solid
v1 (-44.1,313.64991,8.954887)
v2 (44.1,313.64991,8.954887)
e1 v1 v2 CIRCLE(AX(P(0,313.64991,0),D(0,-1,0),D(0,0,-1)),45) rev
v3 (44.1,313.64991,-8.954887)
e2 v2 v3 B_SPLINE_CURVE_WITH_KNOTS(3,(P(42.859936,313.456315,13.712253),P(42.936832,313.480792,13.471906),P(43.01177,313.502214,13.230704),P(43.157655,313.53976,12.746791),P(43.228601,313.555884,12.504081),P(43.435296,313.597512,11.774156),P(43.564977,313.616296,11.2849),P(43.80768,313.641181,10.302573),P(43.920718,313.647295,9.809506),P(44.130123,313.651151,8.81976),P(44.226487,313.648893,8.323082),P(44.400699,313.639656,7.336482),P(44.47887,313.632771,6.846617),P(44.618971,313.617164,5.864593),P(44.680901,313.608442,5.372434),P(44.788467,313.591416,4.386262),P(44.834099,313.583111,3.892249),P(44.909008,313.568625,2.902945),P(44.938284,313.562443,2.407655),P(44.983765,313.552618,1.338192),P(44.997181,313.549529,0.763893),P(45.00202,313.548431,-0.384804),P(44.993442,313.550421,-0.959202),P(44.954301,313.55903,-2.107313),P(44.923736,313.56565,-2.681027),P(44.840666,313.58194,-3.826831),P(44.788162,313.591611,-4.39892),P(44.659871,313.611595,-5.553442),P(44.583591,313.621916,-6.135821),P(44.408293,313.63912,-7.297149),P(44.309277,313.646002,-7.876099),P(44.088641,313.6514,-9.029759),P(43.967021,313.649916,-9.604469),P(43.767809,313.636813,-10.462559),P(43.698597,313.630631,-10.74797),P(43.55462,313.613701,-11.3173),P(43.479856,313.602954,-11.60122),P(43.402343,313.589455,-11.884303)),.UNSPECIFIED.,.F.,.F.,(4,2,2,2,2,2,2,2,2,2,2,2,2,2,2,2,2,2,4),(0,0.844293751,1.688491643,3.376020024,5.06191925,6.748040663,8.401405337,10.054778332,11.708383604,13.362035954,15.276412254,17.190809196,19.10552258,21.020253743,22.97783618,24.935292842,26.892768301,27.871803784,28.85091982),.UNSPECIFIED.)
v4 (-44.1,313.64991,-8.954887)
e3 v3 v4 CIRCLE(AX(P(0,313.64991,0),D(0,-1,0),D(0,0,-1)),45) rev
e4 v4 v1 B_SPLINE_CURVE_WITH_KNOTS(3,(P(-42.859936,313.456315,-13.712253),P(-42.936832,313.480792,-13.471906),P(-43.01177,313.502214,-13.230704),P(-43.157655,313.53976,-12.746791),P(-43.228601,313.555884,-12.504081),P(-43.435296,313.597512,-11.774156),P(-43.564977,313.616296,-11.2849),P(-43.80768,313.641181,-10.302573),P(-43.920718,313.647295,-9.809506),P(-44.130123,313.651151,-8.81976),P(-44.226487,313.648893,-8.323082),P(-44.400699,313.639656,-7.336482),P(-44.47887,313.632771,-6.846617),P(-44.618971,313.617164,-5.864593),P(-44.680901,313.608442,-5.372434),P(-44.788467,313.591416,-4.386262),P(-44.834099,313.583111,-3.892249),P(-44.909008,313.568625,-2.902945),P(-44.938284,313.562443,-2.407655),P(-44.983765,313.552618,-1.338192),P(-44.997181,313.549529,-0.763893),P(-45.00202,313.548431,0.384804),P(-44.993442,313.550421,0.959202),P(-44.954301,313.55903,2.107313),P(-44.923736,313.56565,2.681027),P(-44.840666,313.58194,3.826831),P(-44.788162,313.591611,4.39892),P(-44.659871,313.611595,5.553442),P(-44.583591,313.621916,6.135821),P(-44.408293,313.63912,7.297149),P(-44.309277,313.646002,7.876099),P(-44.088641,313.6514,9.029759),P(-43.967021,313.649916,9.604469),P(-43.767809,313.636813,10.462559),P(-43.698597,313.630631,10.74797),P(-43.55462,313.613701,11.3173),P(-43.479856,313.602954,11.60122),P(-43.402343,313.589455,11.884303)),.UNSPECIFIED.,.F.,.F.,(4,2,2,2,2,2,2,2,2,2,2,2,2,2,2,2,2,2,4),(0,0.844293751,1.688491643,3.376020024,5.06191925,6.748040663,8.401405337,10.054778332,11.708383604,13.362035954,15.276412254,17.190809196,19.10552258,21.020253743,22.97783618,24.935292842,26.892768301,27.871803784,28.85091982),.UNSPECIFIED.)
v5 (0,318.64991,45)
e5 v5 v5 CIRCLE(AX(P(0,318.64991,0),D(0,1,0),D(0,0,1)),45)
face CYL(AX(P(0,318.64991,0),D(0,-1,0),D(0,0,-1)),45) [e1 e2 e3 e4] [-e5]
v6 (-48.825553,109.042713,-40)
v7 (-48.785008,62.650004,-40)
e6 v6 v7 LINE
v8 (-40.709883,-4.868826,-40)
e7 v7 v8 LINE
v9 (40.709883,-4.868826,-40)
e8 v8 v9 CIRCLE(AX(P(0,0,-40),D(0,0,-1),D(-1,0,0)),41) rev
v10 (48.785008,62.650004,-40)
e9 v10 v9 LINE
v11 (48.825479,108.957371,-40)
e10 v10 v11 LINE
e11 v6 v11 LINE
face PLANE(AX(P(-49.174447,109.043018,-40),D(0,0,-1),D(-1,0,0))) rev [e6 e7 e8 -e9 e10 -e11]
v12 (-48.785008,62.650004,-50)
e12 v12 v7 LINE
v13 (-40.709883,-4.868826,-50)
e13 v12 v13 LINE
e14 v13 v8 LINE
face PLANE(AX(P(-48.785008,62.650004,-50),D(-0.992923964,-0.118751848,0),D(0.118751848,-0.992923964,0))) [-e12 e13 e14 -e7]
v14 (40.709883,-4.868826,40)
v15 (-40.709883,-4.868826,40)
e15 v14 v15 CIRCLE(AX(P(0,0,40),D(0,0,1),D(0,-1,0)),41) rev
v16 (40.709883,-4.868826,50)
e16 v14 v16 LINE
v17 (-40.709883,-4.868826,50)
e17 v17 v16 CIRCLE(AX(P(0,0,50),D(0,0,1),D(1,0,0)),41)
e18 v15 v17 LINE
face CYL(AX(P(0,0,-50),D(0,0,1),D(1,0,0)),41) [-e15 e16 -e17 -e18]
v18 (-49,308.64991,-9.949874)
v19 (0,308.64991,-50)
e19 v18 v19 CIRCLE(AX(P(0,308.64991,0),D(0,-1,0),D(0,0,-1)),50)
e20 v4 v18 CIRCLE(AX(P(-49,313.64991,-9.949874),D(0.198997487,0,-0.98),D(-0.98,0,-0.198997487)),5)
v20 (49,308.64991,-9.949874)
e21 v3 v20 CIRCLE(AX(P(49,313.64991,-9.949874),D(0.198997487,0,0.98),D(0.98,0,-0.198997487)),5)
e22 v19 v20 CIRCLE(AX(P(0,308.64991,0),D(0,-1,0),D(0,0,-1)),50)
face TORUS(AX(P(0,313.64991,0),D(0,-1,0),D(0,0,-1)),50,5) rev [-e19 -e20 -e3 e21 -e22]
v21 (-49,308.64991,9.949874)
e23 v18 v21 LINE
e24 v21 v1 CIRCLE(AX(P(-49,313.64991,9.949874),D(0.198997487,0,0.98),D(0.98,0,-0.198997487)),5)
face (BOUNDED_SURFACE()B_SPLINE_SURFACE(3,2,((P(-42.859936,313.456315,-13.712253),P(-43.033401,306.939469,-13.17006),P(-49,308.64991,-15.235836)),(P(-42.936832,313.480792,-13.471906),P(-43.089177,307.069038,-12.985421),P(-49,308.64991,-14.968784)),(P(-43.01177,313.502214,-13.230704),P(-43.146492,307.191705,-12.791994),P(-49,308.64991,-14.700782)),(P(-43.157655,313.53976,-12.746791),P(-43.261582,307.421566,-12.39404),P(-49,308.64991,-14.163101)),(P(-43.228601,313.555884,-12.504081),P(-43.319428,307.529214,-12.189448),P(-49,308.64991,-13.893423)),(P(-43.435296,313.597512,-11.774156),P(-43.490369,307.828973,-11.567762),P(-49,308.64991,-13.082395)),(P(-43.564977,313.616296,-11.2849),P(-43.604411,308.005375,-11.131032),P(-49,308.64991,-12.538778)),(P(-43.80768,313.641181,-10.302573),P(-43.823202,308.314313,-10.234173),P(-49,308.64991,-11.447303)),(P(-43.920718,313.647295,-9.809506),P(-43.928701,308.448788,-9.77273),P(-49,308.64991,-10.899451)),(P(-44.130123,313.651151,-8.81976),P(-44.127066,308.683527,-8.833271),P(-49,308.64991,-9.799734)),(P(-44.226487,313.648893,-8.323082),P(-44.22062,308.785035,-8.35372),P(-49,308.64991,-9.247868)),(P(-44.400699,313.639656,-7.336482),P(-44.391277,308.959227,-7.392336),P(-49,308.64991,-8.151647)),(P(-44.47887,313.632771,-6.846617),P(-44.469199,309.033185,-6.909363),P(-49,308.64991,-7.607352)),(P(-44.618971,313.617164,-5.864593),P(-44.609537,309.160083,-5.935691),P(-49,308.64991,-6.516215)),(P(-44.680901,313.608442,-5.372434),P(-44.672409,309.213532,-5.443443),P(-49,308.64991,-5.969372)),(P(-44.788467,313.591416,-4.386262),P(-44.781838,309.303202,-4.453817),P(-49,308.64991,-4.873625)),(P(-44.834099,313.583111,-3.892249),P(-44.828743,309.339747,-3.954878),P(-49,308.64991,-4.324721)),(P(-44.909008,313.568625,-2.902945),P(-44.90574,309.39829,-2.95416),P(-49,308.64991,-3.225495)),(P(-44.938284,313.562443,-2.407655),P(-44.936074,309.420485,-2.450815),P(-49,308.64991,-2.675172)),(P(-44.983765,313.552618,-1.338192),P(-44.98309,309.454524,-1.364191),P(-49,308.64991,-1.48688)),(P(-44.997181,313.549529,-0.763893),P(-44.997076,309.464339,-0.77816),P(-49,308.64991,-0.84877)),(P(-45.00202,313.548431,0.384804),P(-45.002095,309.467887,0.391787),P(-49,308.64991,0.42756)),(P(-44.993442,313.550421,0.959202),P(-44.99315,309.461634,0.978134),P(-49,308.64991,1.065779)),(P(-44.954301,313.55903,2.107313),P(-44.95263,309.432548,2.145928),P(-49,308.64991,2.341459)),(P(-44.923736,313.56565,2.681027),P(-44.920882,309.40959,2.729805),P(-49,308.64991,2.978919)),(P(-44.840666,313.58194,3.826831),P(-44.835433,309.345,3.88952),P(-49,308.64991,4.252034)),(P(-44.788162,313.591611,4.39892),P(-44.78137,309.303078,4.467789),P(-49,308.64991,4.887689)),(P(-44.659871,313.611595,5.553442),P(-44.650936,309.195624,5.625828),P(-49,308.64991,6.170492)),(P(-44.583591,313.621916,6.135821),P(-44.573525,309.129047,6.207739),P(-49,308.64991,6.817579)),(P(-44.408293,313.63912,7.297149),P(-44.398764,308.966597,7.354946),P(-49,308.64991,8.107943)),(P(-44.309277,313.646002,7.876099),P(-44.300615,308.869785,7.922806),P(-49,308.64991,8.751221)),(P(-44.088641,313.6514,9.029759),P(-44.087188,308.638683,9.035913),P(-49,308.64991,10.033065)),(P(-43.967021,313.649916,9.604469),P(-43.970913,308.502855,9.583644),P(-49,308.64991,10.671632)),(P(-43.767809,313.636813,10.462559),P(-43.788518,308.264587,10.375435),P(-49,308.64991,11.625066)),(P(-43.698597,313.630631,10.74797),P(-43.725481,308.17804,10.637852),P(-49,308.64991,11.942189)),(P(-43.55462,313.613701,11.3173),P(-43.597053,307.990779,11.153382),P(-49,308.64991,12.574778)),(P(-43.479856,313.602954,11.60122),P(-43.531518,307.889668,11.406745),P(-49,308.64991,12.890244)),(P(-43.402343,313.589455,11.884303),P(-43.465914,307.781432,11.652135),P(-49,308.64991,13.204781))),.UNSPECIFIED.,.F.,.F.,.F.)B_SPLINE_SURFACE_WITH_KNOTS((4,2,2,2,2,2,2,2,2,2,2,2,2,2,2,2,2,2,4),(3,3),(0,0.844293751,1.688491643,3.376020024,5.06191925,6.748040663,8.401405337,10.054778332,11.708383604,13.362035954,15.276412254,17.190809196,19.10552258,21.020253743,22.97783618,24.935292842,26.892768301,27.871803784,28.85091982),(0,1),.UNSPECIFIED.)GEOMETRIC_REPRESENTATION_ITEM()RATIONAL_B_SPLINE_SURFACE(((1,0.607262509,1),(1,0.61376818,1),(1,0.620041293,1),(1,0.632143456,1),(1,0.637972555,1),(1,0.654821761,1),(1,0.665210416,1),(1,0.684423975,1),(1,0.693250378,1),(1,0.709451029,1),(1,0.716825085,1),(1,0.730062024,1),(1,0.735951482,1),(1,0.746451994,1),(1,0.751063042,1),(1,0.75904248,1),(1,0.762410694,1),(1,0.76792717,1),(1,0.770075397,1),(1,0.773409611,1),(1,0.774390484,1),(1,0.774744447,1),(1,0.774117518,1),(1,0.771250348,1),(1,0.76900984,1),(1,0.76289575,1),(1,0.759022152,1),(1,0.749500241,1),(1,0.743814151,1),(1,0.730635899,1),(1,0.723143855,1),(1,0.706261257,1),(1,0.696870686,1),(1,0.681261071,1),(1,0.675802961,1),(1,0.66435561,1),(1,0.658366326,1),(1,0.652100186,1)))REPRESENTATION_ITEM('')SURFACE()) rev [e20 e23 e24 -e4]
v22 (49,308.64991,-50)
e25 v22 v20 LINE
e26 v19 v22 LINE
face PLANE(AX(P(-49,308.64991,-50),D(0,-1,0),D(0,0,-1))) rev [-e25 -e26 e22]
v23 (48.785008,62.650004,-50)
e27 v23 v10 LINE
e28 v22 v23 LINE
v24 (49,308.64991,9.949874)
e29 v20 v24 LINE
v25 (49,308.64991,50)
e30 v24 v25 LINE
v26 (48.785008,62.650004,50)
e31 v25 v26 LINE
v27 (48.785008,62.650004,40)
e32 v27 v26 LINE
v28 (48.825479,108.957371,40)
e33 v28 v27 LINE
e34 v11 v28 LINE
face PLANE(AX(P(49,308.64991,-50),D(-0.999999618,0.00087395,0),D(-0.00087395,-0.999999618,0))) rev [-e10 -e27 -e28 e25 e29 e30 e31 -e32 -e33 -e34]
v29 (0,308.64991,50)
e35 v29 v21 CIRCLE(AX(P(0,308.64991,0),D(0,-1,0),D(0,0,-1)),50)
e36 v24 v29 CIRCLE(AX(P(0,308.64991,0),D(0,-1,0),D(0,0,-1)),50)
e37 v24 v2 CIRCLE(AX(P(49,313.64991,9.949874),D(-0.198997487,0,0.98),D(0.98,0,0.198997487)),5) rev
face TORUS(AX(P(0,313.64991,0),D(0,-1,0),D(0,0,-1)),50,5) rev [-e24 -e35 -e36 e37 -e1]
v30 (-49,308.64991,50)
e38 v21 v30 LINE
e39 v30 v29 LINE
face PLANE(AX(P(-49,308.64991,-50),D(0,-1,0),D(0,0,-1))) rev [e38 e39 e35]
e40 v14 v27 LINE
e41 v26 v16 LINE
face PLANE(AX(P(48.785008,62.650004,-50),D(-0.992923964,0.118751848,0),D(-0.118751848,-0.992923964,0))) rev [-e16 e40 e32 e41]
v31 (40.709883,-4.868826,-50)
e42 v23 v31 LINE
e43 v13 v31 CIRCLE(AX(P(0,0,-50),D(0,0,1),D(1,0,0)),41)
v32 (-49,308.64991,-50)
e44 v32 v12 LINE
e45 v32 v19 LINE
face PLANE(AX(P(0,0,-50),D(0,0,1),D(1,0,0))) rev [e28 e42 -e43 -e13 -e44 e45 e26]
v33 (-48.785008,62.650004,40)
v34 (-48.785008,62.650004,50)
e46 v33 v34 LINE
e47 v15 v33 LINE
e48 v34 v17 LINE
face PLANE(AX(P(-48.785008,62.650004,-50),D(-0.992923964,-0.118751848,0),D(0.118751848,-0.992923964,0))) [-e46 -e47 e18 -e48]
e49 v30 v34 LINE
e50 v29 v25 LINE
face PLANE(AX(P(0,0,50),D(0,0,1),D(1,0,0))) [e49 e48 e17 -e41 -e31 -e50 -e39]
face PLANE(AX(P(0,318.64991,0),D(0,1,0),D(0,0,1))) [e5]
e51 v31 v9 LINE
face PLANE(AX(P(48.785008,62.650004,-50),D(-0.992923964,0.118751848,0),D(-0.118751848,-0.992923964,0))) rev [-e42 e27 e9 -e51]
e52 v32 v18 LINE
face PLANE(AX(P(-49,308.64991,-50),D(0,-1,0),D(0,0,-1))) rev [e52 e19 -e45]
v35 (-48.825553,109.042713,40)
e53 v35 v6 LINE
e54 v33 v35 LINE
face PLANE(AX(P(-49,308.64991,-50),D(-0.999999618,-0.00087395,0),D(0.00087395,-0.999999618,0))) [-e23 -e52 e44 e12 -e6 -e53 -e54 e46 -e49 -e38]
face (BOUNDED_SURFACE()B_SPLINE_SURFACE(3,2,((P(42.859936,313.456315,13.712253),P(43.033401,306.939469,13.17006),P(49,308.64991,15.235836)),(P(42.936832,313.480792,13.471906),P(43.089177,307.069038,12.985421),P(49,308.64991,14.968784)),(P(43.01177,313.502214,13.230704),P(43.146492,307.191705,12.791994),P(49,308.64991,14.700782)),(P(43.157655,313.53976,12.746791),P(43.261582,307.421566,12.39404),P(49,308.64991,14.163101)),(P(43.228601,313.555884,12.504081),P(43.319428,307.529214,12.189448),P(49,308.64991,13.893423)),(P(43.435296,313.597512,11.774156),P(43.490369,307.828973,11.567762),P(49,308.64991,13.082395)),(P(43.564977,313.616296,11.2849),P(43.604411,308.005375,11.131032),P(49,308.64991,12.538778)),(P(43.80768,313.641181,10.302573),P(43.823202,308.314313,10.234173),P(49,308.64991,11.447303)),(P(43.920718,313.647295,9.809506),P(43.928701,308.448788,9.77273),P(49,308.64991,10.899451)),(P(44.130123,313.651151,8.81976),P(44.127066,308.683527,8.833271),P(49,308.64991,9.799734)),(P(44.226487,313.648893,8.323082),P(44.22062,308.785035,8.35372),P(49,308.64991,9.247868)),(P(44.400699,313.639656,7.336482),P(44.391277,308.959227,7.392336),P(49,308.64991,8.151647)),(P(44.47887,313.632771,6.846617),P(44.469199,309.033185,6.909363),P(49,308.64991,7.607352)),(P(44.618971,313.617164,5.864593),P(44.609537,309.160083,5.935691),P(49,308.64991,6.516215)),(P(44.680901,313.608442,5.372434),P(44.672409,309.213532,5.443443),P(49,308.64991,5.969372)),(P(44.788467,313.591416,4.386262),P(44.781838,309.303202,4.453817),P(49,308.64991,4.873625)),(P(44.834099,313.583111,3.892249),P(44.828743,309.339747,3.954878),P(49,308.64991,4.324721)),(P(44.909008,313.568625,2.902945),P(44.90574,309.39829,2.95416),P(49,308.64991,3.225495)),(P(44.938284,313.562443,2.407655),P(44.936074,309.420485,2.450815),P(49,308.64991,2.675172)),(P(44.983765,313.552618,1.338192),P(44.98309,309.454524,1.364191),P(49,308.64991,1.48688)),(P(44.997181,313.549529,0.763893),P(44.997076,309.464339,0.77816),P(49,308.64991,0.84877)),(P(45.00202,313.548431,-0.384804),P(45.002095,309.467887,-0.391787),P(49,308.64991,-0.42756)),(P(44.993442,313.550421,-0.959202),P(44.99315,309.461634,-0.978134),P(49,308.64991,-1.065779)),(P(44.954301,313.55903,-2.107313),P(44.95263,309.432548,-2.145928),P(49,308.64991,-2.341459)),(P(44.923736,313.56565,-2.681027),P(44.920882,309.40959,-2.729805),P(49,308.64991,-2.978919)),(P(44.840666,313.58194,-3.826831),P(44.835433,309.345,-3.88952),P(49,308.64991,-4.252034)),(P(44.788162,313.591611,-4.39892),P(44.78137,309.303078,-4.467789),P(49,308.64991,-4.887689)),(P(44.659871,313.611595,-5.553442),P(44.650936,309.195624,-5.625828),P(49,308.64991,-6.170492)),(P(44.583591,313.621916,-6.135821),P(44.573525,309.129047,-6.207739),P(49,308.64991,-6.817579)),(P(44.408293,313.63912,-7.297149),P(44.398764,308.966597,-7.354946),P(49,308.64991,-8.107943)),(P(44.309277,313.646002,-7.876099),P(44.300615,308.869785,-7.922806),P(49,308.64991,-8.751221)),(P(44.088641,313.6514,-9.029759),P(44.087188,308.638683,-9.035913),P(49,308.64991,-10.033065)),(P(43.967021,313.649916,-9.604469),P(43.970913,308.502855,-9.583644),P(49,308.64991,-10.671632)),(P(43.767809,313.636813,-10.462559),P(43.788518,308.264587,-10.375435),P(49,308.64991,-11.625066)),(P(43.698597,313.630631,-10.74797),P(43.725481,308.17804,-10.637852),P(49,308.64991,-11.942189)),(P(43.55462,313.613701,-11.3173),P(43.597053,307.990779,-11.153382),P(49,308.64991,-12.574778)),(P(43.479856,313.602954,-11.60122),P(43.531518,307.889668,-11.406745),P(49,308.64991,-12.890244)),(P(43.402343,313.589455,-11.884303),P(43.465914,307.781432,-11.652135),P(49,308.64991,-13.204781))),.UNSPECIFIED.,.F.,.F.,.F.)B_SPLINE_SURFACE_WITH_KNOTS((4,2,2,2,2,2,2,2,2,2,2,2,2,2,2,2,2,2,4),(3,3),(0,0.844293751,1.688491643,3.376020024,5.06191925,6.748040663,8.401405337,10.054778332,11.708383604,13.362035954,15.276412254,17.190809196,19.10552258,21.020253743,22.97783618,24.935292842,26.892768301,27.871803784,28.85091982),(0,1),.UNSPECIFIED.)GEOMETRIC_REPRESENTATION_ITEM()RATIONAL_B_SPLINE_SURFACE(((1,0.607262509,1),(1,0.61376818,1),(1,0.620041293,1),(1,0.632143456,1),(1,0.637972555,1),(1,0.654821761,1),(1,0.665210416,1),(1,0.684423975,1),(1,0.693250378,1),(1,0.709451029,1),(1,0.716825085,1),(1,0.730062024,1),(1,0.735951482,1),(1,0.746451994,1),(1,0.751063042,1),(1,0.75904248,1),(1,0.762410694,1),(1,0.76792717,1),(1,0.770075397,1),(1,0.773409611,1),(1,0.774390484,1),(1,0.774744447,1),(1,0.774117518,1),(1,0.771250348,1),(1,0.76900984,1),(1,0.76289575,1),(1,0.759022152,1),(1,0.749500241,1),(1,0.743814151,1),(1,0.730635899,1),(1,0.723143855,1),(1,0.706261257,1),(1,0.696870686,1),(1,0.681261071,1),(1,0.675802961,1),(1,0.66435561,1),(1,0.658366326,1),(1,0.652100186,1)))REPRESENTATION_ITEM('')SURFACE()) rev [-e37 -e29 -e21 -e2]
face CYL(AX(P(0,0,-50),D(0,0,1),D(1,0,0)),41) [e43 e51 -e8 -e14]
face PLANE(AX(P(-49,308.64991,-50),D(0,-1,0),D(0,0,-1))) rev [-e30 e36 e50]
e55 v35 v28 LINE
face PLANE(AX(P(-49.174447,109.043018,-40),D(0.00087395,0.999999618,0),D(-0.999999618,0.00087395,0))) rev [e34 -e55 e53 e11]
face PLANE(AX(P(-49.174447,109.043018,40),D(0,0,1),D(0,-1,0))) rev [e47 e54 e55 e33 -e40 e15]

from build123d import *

# Parameters (mm, degrees)
BOSS_EXTRUDE1_DEPTH      = 50
BOSS_EXTRUDE1_DEPTH_BACK = 50
SKETCH2_W                = 80
SKETCH2_H                = 150
CUT_EXTRUDE1_DEPTH       = 367.509355196
SKETCH3_R                = 45
BOSS_EXTRUDE2_DEPTH      = 10
FILLET1_R                = 5


with BuildPart() as part:
    # Sketch1 → Boss-Extrude1 (new, two sides: drawn at the far end of the back side and taken through both)
    with BuildSketch(Plane.XY.offset(-BOSS_EXTRUDE1_DEPTH_BACK)):
        with BuildLine():
            Line((-49, 0), (49, 0))
            Line((49, 0), (48.785008207, -245.999906054))
            Line((48.785008207, -245.999906054), (40.709882529, -313.518735615))
            ThreePointArc((40.709882529, -313.518735615), (0, -349.649909839), (-40.709882529, -313.518735615))
            Line((-40.709882529, -313.518735615), (-48.785008207, -245.999906054))
            Line((-48.785008207, -245.999906054), (-49, 0))
        make_face()
    extrude(amount=BOSS_EXTRUDE1_DEPTH + BOSS_EXTRUDE1_DEPTH_BACK)

    # Sketch2 → Cut-Extrude1 (cut, through all)
    with BuildSketch(Plane(origin=(48.999962574, -0.042823552, 0), x_dir=(0, 0, -1), z_dir=(0.9999996181052956, -0.0008739503779168433, 0))):
        with Locations((0, -274.649791967)):
            Rectangle(SKETCH2_W, SKETCH2_H)
    extrude(amount=-CUT_EXTRUDE1_DEPTH, mode=Mode.SUBTRACT)

    # Sketch3 → Boss-Extrude2 (add)
    with BuildSketch(Plane(origin=(0, 0, 0), x_dir=(1, 0, 0), z_dir=(0, 1, 0))):
        with Locations(Location((0, 0, 0), (0, 0, 270))):
            Circle(SKETCH3_R)
    extrude(amount=BOSS_EXTRUDE2_DEPTH)

    # Fillet1
    fillet1_edges = [part.edges().sort_by_distance(p)[0] for p in [
        (0, 0, -45),
    ]]
    fillet(fillet1_edges, radius=FILLET1_R - 0.0001)  # a hair under: the kernel refuses the full size


with BuildPart() as part_1:
    # Body-Move/Copy1: moved
    add(part.part.moved(Location((0, 308.649909839, 0))))


solid = part_1.part
